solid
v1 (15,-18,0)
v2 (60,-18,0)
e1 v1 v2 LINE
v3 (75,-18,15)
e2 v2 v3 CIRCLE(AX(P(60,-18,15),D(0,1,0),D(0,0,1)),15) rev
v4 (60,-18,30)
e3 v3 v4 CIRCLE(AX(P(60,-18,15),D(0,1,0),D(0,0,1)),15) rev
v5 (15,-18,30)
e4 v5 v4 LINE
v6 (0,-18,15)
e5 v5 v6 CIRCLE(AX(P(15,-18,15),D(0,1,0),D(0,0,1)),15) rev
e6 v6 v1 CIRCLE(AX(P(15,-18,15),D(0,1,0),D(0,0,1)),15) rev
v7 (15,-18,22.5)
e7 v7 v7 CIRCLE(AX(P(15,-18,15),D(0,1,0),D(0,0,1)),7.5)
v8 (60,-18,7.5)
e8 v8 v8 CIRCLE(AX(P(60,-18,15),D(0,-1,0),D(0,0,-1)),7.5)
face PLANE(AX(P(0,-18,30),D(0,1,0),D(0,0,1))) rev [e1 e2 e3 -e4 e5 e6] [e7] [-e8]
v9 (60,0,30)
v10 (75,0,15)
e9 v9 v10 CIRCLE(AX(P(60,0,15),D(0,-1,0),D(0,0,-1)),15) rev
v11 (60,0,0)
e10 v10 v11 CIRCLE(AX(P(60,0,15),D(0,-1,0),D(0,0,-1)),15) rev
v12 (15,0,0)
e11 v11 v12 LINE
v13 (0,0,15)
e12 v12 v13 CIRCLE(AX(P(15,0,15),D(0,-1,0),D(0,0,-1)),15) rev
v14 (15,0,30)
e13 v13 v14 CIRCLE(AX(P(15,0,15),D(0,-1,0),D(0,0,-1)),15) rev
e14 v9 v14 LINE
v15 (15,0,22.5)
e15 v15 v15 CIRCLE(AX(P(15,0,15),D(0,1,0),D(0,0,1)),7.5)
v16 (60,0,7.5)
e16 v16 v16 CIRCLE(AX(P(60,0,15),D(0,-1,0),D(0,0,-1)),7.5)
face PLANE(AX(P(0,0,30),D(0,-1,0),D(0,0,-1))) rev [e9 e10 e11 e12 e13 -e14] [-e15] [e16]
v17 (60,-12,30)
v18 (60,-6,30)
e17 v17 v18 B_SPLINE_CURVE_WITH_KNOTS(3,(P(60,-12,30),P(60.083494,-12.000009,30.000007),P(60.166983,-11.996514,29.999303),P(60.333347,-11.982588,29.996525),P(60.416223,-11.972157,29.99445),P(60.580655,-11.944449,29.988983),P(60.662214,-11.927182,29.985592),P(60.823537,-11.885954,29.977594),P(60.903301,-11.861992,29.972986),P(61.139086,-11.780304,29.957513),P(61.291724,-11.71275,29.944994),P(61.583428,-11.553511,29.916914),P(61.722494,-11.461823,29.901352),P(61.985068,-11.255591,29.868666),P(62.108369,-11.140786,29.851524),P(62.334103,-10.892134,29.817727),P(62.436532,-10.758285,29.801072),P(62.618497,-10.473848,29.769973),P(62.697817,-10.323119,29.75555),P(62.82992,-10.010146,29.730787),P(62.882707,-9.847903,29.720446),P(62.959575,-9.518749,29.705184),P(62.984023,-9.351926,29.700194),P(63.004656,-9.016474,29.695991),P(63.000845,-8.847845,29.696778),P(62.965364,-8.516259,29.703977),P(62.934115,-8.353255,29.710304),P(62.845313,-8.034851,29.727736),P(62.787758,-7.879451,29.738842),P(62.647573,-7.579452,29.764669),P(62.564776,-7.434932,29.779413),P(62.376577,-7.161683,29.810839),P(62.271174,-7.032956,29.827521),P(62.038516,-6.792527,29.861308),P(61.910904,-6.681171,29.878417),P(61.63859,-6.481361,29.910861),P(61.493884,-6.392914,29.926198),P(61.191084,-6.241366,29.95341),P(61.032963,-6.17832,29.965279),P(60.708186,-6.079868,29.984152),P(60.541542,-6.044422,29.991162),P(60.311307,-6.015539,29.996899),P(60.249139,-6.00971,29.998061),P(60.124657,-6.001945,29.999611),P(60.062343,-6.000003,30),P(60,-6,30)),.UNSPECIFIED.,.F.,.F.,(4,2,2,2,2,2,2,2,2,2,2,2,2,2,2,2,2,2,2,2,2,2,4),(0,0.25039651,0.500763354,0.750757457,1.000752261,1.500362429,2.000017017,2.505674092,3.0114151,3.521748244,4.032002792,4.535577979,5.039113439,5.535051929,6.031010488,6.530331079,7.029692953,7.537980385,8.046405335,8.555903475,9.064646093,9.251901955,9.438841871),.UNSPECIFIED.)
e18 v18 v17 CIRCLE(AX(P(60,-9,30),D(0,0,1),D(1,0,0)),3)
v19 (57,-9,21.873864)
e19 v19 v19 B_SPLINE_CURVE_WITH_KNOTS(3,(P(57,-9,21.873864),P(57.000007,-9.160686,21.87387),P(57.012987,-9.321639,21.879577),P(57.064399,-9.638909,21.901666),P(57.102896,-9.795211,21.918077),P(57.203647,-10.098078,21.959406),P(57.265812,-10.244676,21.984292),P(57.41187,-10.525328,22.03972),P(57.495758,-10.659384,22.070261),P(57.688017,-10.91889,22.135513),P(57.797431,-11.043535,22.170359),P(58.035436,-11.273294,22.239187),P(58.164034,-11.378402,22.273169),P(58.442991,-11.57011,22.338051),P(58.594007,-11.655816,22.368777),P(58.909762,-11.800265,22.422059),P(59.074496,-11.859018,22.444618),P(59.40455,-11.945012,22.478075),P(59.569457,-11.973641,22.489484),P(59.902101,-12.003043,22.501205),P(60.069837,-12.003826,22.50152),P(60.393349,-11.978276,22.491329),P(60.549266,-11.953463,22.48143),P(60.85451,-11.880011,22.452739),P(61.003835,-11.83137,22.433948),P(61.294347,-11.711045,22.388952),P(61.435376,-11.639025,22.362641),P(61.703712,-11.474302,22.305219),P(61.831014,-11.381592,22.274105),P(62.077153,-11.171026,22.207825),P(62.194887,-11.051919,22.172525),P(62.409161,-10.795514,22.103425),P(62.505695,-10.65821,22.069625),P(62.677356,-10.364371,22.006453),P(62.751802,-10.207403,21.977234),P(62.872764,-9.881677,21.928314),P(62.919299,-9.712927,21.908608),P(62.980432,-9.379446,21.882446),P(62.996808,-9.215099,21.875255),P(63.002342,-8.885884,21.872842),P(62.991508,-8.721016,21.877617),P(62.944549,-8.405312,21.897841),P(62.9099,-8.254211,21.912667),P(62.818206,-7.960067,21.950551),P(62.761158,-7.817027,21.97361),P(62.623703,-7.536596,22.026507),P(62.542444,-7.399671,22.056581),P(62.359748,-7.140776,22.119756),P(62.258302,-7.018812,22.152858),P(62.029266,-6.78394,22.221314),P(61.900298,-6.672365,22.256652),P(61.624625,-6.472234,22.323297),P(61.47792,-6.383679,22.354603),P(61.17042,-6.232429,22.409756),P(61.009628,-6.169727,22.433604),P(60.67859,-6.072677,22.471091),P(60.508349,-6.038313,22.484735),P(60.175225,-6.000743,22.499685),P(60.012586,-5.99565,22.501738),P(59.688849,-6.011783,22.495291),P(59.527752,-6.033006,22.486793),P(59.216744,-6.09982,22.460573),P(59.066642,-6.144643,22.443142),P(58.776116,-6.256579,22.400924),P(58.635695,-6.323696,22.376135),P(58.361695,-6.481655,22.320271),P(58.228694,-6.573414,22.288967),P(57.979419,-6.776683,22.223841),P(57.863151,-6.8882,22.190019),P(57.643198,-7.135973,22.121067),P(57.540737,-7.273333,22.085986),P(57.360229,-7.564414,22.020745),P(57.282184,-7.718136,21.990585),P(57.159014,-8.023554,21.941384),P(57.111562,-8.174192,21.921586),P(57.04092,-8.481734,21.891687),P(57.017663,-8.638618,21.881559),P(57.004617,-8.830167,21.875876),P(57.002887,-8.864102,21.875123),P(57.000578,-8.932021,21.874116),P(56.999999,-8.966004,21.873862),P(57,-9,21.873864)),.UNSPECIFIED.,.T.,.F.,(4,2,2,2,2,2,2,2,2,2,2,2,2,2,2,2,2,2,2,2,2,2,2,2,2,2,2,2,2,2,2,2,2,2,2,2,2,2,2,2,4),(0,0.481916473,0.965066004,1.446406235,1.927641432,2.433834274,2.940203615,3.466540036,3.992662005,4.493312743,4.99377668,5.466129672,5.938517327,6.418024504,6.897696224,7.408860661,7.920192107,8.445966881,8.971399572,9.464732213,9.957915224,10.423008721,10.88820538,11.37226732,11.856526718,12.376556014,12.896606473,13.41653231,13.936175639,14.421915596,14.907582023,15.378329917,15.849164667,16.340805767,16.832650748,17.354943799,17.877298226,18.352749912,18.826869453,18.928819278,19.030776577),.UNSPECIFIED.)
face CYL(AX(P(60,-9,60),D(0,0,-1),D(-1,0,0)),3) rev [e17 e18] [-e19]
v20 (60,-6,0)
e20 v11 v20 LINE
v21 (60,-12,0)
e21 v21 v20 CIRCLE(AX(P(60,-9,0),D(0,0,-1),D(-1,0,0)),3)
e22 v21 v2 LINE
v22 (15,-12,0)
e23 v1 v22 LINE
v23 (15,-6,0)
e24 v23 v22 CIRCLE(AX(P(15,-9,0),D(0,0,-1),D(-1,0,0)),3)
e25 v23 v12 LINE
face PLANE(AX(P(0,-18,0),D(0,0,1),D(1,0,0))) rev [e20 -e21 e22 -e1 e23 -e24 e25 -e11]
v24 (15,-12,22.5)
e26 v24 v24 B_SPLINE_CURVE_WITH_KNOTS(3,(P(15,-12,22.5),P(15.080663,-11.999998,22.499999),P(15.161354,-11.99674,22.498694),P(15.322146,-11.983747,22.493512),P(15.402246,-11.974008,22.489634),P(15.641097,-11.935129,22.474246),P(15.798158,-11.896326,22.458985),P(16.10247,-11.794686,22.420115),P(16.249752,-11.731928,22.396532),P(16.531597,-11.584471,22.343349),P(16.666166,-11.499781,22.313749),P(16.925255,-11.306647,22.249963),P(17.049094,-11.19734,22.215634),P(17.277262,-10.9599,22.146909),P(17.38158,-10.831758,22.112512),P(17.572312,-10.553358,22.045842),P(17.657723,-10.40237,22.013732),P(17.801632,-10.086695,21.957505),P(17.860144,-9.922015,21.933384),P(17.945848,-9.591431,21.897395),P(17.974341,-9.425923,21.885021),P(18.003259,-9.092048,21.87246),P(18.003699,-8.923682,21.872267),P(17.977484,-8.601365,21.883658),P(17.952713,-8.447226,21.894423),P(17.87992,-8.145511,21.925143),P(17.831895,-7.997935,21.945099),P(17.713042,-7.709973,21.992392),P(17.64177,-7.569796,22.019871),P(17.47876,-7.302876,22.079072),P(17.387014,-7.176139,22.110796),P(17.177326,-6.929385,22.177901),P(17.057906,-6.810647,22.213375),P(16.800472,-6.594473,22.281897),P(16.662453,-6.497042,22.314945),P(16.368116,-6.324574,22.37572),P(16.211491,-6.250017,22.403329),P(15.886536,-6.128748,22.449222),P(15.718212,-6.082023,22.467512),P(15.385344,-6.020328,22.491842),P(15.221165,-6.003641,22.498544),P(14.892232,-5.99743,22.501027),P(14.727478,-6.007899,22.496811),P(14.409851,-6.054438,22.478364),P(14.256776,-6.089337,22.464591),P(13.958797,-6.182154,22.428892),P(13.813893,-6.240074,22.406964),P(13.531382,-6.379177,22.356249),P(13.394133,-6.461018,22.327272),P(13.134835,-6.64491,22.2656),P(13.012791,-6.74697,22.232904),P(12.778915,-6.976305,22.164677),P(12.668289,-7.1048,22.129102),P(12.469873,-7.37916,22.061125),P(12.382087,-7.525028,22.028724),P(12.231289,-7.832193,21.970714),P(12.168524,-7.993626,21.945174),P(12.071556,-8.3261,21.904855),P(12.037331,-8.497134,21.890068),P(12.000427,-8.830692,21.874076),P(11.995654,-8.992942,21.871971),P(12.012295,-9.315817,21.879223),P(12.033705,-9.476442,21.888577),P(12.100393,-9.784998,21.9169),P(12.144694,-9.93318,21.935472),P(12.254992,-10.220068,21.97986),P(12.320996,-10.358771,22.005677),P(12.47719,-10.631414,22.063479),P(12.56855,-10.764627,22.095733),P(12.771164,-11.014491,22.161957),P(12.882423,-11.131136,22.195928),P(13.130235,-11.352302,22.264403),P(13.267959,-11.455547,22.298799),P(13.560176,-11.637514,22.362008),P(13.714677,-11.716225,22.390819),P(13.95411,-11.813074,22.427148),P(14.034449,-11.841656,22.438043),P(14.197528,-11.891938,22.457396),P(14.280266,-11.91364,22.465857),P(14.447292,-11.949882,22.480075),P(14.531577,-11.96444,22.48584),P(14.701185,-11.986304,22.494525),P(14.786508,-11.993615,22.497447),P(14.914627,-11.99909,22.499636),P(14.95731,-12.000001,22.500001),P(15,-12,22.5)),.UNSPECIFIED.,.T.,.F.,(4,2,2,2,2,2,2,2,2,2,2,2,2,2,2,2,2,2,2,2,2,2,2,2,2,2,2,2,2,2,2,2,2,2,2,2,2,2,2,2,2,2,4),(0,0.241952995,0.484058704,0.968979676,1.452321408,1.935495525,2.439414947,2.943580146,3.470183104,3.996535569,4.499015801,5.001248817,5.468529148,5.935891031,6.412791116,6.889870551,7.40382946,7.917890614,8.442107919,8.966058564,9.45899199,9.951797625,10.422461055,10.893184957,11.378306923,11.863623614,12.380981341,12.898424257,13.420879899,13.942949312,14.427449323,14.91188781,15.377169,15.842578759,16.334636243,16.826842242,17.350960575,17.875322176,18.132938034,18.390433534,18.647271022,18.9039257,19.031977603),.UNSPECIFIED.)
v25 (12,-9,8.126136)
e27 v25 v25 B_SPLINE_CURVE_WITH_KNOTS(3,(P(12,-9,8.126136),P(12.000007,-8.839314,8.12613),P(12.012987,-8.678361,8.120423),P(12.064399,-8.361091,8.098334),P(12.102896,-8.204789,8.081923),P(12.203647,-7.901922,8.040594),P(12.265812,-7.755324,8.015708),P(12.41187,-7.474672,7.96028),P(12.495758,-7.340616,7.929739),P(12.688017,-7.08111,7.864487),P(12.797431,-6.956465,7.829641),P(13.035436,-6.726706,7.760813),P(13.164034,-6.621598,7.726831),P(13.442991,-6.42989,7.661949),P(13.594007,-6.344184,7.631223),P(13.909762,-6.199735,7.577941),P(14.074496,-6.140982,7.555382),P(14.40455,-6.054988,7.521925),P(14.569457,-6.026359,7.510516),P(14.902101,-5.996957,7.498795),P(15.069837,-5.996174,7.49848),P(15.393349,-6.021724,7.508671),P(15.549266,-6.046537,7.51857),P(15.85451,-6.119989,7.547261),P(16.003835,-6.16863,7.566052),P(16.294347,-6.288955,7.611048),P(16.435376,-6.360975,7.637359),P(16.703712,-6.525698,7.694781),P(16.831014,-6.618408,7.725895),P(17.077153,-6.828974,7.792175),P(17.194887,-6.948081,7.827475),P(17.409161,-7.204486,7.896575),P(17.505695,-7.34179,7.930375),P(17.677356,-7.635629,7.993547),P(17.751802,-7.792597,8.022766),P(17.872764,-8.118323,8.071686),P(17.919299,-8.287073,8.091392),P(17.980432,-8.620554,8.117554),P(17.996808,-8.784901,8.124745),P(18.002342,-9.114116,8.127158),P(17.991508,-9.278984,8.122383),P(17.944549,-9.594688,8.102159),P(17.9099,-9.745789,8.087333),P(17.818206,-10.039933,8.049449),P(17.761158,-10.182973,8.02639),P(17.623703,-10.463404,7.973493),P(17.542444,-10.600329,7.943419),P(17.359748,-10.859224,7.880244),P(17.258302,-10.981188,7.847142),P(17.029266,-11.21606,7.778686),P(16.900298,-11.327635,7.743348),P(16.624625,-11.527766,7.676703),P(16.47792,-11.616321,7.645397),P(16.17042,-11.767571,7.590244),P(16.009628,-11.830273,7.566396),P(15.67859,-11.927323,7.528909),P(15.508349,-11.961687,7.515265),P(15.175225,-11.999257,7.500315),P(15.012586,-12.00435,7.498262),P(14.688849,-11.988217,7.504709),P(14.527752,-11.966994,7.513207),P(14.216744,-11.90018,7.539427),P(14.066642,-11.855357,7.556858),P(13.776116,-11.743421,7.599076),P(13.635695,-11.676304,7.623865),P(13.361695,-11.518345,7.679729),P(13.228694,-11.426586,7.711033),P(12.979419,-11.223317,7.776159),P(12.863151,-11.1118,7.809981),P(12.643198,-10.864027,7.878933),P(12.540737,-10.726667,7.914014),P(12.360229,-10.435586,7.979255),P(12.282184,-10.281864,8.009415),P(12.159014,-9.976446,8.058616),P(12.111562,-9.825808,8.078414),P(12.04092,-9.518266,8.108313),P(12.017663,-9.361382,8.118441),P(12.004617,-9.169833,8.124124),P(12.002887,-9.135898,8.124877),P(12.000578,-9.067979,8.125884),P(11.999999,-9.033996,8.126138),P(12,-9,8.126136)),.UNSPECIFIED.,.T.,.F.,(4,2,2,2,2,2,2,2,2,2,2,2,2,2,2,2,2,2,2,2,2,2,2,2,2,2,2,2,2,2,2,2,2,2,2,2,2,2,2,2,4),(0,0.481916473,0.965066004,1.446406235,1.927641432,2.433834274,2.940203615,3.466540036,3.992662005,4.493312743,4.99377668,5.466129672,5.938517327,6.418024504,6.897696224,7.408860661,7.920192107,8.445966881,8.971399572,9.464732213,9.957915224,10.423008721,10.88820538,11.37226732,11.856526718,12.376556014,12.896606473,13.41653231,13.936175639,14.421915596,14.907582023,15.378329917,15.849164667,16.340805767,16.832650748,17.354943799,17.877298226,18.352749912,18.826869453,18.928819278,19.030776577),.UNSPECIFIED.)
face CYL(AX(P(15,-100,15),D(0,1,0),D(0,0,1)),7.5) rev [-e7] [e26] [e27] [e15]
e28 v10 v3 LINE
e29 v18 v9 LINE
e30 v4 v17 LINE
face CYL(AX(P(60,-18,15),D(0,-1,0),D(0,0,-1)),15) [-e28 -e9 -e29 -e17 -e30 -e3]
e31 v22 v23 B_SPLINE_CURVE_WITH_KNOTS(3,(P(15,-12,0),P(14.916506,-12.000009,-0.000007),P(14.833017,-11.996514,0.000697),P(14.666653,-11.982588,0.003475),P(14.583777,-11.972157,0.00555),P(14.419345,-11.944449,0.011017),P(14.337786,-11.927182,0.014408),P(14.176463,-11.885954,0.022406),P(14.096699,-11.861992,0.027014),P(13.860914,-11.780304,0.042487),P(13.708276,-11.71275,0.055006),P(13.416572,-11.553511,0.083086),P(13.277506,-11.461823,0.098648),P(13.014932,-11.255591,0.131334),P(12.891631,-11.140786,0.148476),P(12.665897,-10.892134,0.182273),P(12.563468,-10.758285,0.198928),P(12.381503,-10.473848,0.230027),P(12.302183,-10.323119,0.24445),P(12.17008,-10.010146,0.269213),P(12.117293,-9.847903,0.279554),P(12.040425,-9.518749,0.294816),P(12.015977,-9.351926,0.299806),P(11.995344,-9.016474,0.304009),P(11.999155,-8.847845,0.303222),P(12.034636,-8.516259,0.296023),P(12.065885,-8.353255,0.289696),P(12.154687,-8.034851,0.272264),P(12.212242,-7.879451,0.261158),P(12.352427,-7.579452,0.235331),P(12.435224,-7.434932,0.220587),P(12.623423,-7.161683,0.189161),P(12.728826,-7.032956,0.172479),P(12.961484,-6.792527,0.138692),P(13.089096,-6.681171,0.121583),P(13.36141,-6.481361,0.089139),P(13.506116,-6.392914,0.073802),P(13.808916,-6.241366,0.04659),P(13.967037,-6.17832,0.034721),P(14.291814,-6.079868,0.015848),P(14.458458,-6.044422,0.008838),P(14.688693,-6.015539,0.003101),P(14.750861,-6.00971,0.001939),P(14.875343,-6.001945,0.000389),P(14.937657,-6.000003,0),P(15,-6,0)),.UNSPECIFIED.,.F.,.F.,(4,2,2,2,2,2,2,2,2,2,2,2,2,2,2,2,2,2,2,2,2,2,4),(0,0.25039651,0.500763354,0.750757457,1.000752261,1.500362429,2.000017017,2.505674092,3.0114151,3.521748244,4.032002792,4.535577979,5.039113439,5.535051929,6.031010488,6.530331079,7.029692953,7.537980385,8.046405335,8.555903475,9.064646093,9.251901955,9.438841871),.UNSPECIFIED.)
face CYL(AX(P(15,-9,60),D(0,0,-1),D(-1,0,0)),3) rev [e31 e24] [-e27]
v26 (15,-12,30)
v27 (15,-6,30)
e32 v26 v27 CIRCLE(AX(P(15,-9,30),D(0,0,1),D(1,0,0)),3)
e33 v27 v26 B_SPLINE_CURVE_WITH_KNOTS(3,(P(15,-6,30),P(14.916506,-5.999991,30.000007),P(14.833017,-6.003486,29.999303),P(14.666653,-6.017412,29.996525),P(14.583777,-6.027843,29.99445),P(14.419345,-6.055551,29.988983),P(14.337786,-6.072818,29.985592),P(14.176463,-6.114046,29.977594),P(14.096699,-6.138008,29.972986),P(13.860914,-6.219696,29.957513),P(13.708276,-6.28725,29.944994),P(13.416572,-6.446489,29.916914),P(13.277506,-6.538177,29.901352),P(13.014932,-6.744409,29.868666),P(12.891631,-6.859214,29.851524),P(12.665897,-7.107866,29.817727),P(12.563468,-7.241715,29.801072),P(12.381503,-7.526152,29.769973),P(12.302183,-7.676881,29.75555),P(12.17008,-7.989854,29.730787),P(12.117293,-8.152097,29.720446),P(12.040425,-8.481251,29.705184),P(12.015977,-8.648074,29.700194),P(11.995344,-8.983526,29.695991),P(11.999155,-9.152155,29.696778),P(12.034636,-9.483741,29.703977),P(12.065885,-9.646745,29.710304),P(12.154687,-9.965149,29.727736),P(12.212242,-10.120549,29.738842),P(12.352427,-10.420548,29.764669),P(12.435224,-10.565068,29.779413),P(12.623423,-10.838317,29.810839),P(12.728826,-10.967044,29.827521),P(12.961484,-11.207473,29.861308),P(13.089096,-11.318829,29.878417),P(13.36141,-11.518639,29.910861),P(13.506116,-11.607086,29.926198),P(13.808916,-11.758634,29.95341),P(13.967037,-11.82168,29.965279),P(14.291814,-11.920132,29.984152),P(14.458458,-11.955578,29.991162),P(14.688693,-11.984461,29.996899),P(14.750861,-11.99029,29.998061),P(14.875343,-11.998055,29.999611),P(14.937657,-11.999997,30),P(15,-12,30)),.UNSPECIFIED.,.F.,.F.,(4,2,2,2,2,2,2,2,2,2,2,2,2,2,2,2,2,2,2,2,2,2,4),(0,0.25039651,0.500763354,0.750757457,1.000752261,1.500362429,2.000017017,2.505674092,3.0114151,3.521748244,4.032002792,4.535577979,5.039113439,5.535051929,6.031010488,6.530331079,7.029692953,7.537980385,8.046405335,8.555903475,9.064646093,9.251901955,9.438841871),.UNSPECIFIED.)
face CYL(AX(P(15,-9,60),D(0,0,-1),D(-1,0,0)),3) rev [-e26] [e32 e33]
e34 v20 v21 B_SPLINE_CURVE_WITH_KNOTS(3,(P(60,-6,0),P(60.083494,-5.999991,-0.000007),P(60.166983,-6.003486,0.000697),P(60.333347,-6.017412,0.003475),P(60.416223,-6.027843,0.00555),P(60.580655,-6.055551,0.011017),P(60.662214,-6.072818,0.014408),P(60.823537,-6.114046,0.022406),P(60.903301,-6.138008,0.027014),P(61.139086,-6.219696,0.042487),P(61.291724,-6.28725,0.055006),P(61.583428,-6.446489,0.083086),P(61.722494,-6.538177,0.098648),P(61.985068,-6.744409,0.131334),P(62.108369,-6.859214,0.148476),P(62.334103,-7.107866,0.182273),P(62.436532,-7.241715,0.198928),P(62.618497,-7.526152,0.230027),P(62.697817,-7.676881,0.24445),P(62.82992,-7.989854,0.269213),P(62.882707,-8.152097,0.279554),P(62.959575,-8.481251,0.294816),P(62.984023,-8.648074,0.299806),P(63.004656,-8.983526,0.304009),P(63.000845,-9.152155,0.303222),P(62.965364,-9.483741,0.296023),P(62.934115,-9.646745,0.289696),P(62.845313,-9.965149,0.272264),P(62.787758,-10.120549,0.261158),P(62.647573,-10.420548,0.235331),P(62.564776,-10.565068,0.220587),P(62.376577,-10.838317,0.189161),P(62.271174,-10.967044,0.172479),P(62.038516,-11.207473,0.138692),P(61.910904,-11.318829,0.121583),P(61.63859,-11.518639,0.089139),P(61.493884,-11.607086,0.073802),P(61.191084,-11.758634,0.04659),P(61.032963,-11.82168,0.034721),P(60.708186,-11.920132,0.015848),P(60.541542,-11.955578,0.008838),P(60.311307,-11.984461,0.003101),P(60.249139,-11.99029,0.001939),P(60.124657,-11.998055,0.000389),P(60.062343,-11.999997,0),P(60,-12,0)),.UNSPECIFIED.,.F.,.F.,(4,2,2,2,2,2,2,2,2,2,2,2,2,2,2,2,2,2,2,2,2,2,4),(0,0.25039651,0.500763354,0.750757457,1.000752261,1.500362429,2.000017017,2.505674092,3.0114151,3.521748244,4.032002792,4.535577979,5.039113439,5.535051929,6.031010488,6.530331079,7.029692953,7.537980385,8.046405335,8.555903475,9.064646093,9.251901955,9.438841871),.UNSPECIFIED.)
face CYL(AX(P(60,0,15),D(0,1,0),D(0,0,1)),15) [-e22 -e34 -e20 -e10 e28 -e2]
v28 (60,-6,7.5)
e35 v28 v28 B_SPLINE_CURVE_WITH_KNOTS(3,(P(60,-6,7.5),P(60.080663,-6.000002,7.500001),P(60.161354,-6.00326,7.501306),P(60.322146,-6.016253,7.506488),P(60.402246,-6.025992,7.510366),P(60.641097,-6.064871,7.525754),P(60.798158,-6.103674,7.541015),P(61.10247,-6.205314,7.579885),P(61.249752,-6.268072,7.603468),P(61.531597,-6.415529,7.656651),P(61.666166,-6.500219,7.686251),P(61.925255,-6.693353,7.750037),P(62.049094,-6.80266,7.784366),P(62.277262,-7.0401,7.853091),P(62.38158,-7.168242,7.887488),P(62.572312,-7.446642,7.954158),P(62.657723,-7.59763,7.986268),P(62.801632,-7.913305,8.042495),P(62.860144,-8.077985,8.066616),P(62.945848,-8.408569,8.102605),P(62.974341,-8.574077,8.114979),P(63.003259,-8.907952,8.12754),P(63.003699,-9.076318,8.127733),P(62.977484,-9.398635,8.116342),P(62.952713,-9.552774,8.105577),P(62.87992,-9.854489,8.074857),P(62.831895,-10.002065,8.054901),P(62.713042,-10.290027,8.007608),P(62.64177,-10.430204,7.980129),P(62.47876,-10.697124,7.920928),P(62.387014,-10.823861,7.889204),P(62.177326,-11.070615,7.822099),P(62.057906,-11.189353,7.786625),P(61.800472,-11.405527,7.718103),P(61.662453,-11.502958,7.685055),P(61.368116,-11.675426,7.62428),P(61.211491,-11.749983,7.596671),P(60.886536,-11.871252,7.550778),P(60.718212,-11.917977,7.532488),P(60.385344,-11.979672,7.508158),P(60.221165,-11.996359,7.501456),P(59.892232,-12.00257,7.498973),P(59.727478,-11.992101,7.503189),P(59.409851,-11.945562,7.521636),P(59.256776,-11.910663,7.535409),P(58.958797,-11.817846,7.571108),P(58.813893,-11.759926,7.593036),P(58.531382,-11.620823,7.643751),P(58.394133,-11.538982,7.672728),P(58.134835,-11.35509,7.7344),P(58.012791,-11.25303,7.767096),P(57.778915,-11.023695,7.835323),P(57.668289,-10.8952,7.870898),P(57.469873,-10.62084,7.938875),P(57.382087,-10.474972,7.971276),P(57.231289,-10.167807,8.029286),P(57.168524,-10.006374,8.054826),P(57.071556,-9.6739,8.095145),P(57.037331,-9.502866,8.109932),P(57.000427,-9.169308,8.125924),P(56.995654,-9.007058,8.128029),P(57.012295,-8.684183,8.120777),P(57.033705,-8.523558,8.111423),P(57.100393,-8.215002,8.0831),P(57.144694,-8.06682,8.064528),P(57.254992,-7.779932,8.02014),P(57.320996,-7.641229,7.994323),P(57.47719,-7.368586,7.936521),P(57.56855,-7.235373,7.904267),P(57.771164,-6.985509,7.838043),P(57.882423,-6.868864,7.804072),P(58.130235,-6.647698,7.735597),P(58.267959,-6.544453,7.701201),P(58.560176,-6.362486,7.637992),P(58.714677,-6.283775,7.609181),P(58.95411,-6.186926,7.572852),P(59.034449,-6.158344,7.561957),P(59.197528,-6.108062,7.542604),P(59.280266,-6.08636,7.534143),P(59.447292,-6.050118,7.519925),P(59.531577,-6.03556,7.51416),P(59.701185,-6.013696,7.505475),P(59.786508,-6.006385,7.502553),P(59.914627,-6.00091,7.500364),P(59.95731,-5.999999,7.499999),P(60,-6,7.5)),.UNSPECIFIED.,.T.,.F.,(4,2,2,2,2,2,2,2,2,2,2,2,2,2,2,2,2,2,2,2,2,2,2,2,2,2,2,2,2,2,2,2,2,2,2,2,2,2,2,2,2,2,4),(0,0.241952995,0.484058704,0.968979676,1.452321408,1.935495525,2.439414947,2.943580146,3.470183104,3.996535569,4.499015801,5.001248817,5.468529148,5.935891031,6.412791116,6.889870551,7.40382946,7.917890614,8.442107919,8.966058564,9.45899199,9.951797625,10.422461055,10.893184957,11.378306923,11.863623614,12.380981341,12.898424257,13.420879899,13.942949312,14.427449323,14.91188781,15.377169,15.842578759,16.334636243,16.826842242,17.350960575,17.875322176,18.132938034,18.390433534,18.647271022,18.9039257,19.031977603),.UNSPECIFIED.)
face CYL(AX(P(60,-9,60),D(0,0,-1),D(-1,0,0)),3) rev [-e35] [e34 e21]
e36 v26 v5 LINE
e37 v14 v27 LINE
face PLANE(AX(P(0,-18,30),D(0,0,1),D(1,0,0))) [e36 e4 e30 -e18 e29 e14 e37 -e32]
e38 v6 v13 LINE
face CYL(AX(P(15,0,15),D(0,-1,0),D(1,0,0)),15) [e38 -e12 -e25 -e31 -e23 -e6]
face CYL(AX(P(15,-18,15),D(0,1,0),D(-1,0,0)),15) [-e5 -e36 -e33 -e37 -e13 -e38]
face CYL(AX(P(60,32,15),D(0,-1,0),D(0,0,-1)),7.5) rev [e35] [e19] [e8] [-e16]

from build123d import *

# Parameters (mm, degrees)
SKETCH_1_W          = 75
SKETCH_1_H          = 18
EXTRUDE_1_DEPTH     = 30
SKETCH_9_R          = 7.5
CUT_EXTRUDE_6_DEPTH = 100
FILLET_1_R          = 15
SKETCH_10_R         = 7.5
CUT_EXTRUDE_7_DEPTH = 50
SKETCH_11_R         = 3
CUT_EXTRUDE_8_DEPTH = 60


with BuildPart() as part:
    # 草图1 → 拉伸1 (new body)
    with BuildSketch(Plane.XY):
        with Locations((37.5, -9)):
            Rectangle(SKETCH_1_W, SKETCH_1_H)
    extrude(amount=EXTRUDE_1_DEPTH)

    # 草图9 → 切除-拉伸6 (cut)
    with BuildSketch(Plane(origin=(0, 0, 0), x_dir=(1, 0, 0), z_dir=(0, 1, 0))):
        with Locations(Location((15, -15, 0), (0, 0, 270))):
            Circle(SKETCH_9_R)
    extrude(amount=-CUT_EXTRUDE_6_DEPTH, mode=Mode.SUBTRACT)

    # 圆角1
    fillet_1_edges = [part.edges().sort_by_distance(p)[0] for p in [
        (75, -9, 0),
        (75, -9, 30),
        (0, -9, 0),
        (0, -9, 30),
    ]]
    fillet(fillet_1_edges, radius=FILLET_1_R - 0.0001)  # a hair under: the kernel refuses the full size

    # 草图10 → 切除-拉伸7 (cut)
    with BuildSketch(Plane.XZ.offset(18)):
        with Locations(Location((60, 15, 0), (0, 0, 270))):
            Circle(SKETCH_10_R)
    extrude(amount=-CUT_EXTRUDE_7_DEPTH, mode=Mode.SUBTRACT)

    # 草图11 → 切除-拉伸8 (cut)
    with BuildSketch(Plane(origin=(0, 0, 0), x_dir=(-1, 0, 0), z_dir=(0, 0, -1))):
        with Locations((-60, -9)):
            Circle(SKETCH_11_R)
        with Locations((-15, -9)):
            Circle(SKETCH_11_R)
    extrude(amount=-CUT_EXTRUDE_8_DEPTH, mode=Mode.SUBTRACT)


solid = part.part
